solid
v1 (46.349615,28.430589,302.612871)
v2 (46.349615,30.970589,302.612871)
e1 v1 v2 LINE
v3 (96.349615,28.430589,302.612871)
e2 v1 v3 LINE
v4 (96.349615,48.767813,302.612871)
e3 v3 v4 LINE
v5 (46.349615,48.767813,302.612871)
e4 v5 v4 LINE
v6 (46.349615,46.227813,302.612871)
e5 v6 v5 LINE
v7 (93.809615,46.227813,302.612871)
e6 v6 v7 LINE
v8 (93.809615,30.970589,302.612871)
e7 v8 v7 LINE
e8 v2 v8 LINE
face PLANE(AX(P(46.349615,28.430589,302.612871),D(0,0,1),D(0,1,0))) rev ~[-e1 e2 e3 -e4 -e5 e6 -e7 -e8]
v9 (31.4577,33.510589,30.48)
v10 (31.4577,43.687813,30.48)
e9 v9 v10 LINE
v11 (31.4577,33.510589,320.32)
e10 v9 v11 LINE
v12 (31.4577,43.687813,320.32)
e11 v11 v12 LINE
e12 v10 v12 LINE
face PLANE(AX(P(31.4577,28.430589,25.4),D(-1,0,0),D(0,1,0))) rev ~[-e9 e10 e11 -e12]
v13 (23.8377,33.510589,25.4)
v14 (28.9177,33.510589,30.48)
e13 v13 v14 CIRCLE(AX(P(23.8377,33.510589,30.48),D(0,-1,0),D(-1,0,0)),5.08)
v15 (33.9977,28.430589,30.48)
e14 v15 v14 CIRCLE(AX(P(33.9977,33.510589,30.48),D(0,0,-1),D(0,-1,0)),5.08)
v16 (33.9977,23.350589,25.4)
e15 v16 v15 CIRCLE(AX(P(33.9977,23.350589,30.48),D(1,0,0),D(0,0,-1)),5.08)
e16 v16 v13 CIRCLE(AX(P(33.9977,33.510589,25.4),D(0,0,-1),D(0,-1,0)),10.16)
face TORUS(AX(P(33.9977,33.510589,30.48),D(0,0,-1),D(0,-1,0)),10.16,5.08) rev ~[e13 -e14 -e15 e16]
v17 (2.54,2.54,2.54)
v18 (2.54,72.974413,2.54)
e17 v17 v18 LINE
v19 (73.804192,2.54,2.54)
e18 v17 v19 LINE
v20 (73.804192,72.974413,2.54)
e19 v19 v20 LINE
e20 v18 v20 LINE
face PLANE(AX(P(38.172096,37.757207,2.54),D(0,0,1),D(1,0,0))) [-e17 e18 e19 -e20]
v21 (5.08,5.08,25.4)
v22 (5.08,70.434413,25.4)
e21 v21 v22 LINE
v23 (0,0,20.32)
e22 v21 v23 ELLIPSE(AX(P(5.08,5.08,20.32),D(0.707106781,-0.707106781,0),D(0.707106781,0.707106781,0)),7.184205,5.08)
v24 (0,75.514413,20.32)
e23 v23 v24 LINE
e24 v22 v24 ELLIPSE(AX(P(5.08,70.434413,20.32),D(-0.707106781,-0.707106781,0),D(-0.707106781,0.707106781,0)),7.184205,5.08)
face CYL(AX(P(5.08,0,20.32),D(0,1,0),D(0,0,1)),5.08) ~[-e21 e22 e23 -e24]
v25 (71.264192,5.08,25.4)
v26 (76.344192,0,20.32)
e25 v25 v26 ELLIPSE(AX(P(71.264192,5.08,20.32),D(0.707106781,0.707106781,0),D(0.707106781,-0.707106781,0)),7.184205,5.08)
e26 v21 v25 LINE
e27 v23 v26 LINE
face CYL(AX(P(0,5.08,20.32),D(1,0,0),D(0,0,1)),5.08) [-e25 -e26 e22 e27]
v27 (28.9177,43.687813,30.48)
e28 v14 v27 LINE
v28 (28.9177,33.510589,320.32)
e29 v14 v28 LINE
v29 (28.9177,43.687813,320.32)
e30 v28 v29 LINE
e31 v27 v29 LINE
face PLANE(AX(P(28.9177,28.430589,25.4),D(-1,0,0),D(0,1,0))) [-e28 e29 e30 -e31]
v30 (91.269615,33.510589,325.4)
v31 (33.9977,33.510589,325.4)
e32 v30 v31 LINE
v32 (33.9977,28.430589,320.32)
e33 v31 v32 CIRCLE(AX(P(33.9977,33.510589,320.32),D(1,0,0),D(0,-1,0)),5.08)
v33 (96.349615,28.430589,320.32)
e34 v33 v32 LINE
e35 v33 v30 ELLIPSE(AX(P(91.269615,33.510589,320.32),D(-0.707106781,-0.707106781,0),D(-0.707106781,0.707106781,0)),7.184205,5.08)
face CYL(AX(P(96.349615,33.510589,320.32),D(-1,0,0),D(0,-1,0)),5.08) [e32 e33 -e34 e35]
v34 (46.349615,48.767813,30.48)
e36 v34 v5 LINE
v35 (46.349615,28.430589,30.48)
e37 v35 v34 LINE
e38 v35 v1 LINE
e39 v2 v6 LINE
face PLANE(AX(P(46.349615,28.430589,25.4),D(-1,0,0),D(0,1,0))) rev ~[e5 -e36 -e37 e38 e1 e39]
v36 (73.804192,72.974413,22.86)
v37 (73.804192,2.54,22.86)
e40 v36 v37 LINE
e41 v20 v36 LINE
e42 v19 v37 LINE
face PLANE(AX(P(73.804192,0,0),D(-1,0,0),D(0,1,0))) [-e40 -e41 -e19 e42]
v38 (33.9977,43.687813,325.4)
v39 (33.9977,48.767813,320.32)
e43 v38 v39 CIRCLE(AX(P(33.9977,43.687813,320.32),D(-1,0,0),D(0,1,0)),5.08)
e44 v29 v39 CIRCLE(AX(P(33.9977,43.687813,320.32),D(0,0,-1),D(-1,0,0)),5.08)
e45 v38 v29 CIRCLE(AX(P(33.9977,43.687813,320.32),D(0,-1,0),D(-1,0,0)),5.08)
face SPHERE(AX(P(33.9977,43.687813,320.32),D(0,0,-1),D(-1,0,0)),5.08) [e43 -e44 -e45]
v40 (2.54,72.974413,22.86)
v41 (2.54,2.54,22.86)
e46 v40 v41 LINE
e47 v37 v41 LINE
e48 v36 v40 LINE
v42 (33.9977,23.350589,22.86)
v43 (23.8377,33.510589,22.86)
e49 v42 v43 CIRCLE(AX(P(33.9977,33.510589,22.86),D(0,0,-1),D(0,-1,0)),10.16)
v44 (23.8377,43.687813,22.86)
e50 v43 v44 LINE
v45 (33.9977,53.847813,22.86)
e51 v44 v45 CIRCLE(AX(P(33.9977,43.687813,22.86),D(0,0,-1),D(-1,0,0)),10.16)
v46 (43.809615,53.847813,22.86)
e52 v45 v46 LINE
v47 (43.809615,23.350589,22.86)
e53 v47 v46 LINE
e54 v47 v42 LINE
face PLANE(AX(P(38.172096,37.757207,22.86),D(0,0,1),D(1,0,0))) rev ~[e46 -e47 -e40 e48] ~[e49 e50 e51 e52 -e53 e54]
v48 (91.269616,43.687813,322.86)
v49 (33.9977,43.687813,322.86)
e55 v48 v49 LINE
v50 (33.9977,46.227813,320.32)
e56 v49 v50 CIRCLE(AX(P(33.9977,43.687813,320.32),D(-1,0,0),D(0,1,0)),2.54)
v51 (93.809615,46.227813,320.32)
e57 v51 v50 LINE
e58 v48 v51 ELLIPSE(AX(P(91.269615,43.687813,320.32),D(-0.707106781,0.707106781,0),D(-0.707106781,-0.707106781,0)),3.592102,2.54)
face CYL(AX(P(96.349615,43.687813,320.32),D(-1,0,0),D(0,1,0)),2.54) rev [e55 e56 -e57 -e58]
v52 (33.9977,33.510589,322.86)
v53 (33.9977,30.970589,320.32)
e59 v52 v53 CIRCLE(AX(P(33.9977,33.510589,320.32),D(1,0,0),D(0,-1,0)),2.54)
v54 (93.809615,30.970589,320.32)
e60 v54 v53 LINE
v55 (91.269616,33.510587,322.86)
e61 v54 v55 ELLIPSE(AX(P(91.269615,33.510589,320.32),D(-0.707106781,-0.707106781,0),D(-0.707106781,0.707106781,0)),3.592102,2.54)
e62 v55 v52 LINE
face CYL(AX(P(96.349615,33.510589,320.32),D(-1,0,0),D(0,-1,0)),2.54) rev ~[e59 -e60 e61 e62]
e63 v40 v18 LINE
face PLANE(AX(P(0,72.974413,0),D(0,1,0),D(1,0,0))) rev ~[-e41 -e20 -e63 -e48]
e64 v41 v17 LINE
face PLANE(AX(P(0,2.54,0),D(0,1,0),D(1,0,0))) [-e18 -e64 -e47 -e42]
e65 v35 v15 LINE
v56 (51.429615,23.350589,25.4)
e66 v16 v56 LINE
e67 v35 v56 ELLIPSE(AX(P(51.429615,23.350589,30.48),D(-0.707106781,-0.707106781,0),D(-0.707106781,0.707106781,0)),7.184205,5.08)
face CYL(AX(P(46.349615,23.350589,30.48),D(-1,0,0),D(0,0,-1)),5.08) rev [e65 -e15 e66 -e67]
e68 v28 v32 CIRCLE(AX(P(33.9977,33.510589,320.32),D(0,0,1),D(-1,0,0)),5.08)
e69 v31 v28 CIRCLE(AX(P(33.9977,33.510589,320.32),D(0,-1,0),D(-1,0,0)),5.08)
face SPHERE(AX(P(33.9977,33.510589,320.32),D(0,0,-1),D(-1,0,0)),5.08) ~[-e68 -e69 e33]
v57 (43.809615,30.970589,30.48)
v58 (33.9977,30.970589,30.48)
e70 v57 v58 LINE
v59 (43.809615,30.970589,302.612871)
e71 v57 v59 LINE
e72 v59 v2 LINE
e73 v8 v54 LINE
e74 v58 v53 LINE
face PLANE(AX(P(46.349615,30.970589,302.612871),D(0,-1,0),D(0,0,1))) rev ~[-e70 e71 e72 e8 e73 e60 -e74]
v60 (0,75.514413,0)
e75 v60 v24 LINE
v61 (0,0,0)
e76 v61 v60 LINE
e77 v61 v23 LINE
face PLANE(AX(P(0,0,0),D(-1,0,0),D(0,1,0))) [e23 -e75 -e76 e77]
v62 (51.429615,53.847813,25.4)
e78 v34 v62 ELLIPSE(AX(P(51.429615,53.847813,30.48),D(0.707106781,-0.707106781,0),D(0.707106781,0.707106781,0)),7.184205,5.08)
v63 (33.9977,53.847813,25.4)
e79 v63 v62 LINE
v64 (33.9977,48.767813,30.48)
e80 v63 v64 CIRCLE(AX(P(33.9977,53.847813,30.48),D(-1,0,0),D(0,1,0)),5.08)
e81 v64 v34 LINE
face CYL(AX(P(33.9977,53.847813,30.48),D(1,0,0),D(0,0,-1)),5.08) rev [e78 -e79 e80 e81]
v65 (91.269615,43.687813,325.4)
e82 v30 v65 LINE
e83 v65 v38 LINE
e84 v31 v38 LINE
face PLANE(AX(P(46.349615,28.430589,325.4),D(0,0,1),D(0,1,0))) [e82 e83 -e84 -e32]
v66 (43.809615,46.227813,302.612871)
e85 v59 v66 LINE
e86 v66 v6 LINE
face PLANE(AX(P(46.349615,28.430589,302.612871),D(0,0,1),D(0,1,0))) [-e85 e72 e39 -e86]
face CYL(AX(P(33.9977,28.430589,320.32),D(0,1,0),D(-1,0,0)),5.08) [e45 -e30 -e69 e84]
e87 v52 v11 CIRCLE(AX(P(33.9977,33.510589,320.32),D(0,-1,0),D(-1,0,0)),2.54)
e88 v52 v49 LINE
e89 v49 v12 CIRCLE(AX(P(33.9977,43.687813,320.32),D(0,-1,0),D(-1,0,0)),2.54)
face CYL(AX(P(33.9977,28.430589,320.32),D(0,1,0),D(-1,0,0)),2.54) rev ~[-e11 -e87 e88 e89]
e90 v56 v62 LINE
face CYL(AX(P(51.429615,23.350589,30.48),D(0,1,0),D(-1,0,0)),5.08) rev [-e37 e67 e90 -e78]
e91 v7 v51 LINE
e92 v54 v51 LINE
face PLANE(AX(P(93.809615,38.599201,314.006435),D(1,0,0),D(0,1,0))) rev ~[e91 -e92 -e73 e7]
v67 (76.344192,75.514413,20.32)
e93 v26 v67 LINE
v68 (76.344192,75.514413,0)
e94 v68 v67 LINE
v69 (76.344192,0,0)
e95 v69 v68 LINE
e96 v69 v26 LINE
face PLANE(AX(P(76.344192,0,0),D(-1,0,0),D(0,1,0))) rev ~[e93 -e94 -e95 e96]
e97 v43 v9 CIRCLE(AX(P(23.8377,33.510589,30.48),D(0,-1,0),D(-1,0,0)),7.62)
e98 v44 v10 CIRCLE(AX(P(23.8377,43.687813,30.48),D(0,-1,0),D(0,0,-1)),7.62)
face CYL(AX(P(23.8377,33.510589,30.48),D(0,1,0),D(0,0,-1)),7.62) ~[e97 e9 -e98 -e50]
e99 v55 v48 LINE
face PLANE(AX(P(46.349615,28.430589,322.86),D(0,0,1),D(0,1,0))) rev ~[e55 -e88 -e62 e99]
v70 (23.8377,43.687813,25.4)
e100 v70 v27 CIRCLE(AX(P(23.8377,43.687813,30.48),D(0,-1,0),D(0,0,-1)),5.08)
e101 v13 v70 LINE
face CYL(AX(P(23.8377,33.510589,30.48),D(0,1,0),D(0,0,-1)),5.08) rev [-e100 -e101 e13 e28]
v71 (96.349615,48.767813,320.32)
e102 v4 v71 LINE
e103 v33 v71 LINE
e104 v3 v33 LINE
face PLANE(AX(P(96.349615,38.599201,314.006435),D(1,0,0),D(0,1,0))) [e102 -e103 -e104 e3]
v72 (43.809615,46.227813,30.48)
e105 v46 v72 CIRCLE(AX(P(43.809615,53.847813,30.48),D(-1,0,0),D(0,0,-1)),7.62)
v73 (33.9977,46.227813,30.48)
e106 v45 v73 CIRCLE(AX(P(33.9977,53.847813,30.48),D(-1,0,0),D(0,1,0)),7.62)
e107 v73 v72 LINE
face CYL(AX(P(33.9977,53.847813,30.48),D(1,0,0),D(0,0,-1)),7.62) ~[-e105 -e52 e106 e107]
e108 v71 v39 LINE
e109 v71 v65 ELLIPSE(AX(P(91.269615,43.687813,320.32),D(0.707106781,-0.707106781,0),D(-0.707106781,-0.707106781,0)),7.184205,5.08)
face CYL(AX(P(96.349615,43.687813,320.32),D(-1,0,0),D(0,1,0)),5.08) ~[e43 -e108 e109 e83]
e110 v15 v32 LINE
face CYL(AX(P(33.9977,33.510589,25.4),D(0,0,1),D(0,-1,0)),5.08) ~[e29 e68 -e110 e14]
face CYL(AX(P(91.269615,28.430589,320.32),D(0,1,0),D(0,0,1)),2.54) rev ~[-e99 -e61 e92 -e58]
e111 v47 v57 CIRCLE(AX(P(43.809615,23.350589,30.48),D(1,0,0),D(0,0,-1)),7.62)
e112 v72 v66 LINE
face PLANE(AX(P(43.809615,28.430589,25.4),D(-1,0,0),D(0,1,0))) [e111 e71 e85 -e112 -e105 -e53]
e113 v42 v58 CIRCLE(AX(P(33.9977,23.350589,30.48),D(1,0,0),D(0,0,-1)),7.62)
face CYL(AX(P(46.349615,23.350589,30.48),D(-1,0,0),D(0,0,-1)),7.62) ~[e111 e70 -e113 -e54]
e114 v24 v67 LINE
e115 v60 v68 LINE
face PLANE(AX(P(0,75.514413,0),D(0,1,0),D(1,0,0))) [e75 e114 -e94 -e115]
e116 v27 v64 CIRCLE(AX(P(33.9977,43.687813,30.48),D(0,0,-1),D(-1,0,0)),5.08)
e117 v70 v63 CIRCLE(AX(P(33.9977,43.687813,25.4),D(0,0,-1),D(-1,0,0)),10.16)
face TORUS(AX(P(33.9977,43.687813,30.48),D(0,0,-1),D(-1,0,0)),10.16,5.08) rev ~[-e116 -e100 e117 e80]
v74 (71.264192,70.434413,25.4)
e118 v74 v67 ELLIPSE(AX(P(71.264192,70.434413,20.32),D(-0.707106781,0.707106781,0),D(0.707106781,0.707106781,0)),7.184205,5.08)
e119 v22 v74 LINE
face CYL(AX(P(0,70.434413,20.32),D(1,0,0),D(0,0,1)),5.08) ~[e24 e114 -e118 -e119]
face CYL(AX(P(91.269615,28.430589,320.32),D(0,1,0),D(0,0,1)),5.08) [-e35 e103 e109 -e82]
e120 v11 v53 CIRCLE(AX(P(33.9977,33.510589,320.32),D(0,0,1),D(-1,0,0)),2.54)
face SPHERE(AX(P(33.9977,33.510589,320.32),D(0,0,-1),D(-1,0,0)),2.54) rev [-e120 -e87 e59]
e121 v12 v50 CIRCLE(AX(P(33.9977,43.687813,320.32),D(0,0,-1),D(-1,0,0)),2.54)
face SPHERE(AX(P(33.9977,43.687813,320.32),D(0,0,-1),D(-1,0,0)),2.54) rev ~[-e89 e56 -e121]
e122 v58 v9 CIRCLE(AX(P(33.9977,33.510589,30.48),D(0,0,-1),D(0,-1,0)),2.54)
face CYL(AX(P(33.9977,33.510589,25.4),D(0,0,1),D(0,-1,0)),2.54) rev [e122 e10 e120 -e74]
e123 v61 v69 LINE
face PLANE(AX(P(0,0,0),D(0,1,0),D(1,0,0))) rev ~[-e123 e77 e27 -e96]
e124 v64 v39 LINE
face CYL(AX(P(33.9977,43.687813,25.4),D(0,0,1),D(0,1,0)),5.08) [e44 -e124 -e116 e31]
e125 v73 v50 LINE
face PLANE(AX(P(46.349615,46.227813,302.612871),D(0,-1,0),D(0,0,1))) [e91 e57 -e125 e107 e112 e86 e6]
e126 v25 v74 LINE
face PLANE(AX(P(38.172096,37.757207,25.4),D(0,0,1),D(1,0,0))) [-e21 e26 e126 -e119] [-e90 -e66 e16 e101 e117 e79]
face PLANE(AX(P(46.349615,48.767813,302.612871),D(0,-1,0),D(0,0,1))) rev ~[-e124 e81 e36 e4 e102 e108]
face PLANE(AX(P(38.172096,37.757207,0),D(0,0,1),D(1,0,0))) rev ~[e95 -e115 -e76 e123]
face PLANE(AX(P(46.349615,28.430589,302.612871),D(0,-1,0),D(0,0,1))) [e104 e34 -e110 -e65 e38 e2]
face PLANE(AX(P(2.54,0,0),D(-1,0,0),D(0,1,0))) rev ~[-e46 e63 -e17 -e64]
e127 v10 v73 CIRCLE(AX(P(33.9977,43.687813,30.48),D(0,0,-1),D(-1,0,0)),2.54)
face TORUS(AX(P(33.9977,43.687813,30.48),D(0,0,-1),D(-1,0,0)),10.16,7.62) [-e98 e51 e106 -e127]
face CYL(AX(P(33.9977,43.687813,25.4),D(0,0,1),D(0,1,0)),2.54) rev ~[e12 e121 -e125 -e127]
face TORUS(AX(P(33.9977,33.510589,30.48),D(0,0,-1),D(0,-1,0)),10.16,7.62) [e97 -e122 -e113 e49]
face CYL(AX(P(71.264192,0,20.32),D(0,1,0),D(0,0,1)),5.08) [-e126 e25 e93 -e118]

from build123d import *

# Parameters (mm, degrees)
F0_W        = 76.344192028
F0_H        = 75.5144134164
F1_DEPTH    = 25.4
F2_W        = 17.4319148064
F2_H        = 20.3372240067
F3_DEPTH    = 300
F4_W        = 20.3372240067
F4_H        = 22.7871290684
F5_DEPTH    = 50
F6_F1_R     = 5.08
F6_F2_R     = 5.08
F7_T        = 2.54
F7_T3_DEPTH = 10.16
F7_T5_DEPTH = 25.4172240067
F7_T7_DEPTH = 10.16
F8_R        = 5.08


# Not quite as in the source:
# - a shell that OpenCascade refuses in one call is made with other operations: the cavity is built on its own and cut out


with BuildPart() as f1:
    # F0 (on Top) → F1 (new body)
    with BuildSketch(Plane.XY):
        with Locations((38.172096014, 37.7572067082)):
            Rectangle(F0_W, F0_H)
    extrude(amount=F1_DEPTH)

    # F2 (on face) → F3 (join)
    with BuildSketch(Plane.XY.offset(25.4)):
        with Locations((37.6336574554, 38.5992005467)):
            Rectangle(F2_W, F2_H)
    extrude(amount=F3_DEPTH)

    # F4 (on face) → F5 (join)
    with BuildSketch(Plane.YZ.offset(46.3496148586)):
        with Locations((38.5992005467, 314.0064354658)):
            Rectangle(F4_W, F4_H)
    extrude(amount=F5_DEPTH)

    # F6: fillet of radius 5.08 on 7 edges, made by hand

    # F6_f1
    f6_f1_edges = [f1.edges().sort_by_distance(p)[0] for p in [
        (28.9177000523, 48.7678125501, 175.4),
        (28.9177000523, 28.4305885434, 175.4),
        (28.9177000523, 38.5992005467, 325.4),
        (62.6336574554, 48.7678125501, 325.4),
        (62.6336574554, 28.4305885434, 325.4),
        (96.3496148586, 38.5992005467, 325.4),
    ]]
    fillet(f6_f1_edges, radius=F6_F1_R)

    # F6_f2
    f6_f2_edges = [f1.edges().sort_by_distance(p)[0] for p in [
        (28.9177000523, 38.5992005467, 25.4),
        (30.4055976038, 47.2799149985, 25.4),
        (30.4055976038, 29.918486095, 25.4),
    ]]
    fillet(f6_f2_edges, radius=F6_F2_R)

    # F7: shell of thickness 2.54, made by hand


with BuildPart() as f7_core1:
    # F7_t2: copy of F1
    add(f1.part)

    # the walls: a layer under each face that stays
    f7_faces = [f7_core1.faces().sort_by_distance(p)[0] for p in [
        (12.7240320047, 12.5857355694, 25.4),
        (46.3496148586, 38.5992005467, 164.0064354658),
        (40.1736574554, 50.2557101016, 26.8878975516),
        (29.3534951554, 48.3320174469, 26.8878975516),
        (40.1736574554, 26.9426909918, 26.8878975516),
        (27.4298025007, 38.5992005467, 26.8878975516),
        (29.3534951554, 28.8663836466, 26.8878975516),
        (0, 37.7572067082, 12.7),
        (38.172096014, 75.5144134164, 12.7),
        (38.172096014, 0, 12.7),
        (76.344192028, 37.7572067082, 12.7),
        (44.3896858533, 48.7678125501, 272.0133333333),
        (44.3896858533, 28.4305885434, 272.0133333333),
        (30.4055976038, 47.2799149985, 175.4),
        (28.9177000523, 38.5992005467, 175.4),
        (30.4055976038, 29.918486095, 175.4),
        (38.172096014, 37.7572067082, 0),
        (65.1736574554, 47.2799149985, 323.9121024484),
        (96.3496148586, 38.5992005467, 311.4664354658),
        (65.1736574554, 29.918486095, 323.9121024484),
        (31.4577000523, 46.2278125501, 323.9121024484),
        (30.4055976038, 38.5992005467, 323.9121024484),
        (31.4577000523, 30.9705885434, 323.9121024484),
        (62.6336574554, 38.5992005467, 325.4),
        (94.8617173071, 38.5992005467, 323.9121024484),
    ]]
    thicken(f7_faces, amount=-F7_T, mode=Mode.SUBTRACT)

    # F7_s4 → F7_t3 (cut)
    with BuildSketch(Plane.XZ.offset(-56.3878125501)):
        Polygon((46.3750148586, 25.4254), (46.3496148586, 22.86), (43.8096148586, 22.86), (43.8096148586, 25.4), align=None)
    extrude(amount=F7_T3_DEPTH, mode=Mode.SUBTRACT)

    # F7_s6 → F7_t5 (cut)
    with BuildSketch(Plane.XZ.offset(-51.3078125501)):
        Polygon((46.3750148586, 25.4254), (46.3496148586, 22.86), (43.8096148586, 22.86), (43.8096148586, 25.4), align=None)
    extrude(amount=F7_T5_DEPTH, mode=Mode.SUBTRACT)

    # F7_s8 → F7_t7 (cut)
    with BuildSketch(Plane.XZ.offset(-30.9705885434)):
        Polygon((46.3750148586, 25.4254), (46.3496148586, 22.86), (43.8096148586, 22.86), (43.8096148586, 25.4), align=None)
    extrude(amount=F7_T7_DEPTH, mode=Mode.SUBTRACT)


with BuildPart() as f1_1:
    add(f1.part)

    # what is left inside the walls is the cavity
    f7_cavity = [f7_core1.part.solids().sort_by_distance(p)[0] for p in [
        (38.172096, 26.018138, 2.5654),
    ]]
    add(f7_cavity, mode=Mode.SUBTRACT)

    # F8
    f8_edges = [f1_1.edges().sort_by_distance(p)[0] for p in [
        (46.349615, 38.599201, 25.4),
        (40.173657, 23.350589, 25.4),
        (26.813495, 26.326384, 25.4),
        (23.8377, 38.599201, 25.4),
        (26.813495, 50.872017, 25.4),
        (40.173657, 53.847813, 25.4),
        (0, 37.757207, 25.4),
        (38.172096, 0, 25.4),
        (76.344192, 37.757207, 25.4),
        (38.172096, 75.514413, 25.4),
    ]]
    fillet(f8_edges, radius=F8_R)


solid = f1_1.part
